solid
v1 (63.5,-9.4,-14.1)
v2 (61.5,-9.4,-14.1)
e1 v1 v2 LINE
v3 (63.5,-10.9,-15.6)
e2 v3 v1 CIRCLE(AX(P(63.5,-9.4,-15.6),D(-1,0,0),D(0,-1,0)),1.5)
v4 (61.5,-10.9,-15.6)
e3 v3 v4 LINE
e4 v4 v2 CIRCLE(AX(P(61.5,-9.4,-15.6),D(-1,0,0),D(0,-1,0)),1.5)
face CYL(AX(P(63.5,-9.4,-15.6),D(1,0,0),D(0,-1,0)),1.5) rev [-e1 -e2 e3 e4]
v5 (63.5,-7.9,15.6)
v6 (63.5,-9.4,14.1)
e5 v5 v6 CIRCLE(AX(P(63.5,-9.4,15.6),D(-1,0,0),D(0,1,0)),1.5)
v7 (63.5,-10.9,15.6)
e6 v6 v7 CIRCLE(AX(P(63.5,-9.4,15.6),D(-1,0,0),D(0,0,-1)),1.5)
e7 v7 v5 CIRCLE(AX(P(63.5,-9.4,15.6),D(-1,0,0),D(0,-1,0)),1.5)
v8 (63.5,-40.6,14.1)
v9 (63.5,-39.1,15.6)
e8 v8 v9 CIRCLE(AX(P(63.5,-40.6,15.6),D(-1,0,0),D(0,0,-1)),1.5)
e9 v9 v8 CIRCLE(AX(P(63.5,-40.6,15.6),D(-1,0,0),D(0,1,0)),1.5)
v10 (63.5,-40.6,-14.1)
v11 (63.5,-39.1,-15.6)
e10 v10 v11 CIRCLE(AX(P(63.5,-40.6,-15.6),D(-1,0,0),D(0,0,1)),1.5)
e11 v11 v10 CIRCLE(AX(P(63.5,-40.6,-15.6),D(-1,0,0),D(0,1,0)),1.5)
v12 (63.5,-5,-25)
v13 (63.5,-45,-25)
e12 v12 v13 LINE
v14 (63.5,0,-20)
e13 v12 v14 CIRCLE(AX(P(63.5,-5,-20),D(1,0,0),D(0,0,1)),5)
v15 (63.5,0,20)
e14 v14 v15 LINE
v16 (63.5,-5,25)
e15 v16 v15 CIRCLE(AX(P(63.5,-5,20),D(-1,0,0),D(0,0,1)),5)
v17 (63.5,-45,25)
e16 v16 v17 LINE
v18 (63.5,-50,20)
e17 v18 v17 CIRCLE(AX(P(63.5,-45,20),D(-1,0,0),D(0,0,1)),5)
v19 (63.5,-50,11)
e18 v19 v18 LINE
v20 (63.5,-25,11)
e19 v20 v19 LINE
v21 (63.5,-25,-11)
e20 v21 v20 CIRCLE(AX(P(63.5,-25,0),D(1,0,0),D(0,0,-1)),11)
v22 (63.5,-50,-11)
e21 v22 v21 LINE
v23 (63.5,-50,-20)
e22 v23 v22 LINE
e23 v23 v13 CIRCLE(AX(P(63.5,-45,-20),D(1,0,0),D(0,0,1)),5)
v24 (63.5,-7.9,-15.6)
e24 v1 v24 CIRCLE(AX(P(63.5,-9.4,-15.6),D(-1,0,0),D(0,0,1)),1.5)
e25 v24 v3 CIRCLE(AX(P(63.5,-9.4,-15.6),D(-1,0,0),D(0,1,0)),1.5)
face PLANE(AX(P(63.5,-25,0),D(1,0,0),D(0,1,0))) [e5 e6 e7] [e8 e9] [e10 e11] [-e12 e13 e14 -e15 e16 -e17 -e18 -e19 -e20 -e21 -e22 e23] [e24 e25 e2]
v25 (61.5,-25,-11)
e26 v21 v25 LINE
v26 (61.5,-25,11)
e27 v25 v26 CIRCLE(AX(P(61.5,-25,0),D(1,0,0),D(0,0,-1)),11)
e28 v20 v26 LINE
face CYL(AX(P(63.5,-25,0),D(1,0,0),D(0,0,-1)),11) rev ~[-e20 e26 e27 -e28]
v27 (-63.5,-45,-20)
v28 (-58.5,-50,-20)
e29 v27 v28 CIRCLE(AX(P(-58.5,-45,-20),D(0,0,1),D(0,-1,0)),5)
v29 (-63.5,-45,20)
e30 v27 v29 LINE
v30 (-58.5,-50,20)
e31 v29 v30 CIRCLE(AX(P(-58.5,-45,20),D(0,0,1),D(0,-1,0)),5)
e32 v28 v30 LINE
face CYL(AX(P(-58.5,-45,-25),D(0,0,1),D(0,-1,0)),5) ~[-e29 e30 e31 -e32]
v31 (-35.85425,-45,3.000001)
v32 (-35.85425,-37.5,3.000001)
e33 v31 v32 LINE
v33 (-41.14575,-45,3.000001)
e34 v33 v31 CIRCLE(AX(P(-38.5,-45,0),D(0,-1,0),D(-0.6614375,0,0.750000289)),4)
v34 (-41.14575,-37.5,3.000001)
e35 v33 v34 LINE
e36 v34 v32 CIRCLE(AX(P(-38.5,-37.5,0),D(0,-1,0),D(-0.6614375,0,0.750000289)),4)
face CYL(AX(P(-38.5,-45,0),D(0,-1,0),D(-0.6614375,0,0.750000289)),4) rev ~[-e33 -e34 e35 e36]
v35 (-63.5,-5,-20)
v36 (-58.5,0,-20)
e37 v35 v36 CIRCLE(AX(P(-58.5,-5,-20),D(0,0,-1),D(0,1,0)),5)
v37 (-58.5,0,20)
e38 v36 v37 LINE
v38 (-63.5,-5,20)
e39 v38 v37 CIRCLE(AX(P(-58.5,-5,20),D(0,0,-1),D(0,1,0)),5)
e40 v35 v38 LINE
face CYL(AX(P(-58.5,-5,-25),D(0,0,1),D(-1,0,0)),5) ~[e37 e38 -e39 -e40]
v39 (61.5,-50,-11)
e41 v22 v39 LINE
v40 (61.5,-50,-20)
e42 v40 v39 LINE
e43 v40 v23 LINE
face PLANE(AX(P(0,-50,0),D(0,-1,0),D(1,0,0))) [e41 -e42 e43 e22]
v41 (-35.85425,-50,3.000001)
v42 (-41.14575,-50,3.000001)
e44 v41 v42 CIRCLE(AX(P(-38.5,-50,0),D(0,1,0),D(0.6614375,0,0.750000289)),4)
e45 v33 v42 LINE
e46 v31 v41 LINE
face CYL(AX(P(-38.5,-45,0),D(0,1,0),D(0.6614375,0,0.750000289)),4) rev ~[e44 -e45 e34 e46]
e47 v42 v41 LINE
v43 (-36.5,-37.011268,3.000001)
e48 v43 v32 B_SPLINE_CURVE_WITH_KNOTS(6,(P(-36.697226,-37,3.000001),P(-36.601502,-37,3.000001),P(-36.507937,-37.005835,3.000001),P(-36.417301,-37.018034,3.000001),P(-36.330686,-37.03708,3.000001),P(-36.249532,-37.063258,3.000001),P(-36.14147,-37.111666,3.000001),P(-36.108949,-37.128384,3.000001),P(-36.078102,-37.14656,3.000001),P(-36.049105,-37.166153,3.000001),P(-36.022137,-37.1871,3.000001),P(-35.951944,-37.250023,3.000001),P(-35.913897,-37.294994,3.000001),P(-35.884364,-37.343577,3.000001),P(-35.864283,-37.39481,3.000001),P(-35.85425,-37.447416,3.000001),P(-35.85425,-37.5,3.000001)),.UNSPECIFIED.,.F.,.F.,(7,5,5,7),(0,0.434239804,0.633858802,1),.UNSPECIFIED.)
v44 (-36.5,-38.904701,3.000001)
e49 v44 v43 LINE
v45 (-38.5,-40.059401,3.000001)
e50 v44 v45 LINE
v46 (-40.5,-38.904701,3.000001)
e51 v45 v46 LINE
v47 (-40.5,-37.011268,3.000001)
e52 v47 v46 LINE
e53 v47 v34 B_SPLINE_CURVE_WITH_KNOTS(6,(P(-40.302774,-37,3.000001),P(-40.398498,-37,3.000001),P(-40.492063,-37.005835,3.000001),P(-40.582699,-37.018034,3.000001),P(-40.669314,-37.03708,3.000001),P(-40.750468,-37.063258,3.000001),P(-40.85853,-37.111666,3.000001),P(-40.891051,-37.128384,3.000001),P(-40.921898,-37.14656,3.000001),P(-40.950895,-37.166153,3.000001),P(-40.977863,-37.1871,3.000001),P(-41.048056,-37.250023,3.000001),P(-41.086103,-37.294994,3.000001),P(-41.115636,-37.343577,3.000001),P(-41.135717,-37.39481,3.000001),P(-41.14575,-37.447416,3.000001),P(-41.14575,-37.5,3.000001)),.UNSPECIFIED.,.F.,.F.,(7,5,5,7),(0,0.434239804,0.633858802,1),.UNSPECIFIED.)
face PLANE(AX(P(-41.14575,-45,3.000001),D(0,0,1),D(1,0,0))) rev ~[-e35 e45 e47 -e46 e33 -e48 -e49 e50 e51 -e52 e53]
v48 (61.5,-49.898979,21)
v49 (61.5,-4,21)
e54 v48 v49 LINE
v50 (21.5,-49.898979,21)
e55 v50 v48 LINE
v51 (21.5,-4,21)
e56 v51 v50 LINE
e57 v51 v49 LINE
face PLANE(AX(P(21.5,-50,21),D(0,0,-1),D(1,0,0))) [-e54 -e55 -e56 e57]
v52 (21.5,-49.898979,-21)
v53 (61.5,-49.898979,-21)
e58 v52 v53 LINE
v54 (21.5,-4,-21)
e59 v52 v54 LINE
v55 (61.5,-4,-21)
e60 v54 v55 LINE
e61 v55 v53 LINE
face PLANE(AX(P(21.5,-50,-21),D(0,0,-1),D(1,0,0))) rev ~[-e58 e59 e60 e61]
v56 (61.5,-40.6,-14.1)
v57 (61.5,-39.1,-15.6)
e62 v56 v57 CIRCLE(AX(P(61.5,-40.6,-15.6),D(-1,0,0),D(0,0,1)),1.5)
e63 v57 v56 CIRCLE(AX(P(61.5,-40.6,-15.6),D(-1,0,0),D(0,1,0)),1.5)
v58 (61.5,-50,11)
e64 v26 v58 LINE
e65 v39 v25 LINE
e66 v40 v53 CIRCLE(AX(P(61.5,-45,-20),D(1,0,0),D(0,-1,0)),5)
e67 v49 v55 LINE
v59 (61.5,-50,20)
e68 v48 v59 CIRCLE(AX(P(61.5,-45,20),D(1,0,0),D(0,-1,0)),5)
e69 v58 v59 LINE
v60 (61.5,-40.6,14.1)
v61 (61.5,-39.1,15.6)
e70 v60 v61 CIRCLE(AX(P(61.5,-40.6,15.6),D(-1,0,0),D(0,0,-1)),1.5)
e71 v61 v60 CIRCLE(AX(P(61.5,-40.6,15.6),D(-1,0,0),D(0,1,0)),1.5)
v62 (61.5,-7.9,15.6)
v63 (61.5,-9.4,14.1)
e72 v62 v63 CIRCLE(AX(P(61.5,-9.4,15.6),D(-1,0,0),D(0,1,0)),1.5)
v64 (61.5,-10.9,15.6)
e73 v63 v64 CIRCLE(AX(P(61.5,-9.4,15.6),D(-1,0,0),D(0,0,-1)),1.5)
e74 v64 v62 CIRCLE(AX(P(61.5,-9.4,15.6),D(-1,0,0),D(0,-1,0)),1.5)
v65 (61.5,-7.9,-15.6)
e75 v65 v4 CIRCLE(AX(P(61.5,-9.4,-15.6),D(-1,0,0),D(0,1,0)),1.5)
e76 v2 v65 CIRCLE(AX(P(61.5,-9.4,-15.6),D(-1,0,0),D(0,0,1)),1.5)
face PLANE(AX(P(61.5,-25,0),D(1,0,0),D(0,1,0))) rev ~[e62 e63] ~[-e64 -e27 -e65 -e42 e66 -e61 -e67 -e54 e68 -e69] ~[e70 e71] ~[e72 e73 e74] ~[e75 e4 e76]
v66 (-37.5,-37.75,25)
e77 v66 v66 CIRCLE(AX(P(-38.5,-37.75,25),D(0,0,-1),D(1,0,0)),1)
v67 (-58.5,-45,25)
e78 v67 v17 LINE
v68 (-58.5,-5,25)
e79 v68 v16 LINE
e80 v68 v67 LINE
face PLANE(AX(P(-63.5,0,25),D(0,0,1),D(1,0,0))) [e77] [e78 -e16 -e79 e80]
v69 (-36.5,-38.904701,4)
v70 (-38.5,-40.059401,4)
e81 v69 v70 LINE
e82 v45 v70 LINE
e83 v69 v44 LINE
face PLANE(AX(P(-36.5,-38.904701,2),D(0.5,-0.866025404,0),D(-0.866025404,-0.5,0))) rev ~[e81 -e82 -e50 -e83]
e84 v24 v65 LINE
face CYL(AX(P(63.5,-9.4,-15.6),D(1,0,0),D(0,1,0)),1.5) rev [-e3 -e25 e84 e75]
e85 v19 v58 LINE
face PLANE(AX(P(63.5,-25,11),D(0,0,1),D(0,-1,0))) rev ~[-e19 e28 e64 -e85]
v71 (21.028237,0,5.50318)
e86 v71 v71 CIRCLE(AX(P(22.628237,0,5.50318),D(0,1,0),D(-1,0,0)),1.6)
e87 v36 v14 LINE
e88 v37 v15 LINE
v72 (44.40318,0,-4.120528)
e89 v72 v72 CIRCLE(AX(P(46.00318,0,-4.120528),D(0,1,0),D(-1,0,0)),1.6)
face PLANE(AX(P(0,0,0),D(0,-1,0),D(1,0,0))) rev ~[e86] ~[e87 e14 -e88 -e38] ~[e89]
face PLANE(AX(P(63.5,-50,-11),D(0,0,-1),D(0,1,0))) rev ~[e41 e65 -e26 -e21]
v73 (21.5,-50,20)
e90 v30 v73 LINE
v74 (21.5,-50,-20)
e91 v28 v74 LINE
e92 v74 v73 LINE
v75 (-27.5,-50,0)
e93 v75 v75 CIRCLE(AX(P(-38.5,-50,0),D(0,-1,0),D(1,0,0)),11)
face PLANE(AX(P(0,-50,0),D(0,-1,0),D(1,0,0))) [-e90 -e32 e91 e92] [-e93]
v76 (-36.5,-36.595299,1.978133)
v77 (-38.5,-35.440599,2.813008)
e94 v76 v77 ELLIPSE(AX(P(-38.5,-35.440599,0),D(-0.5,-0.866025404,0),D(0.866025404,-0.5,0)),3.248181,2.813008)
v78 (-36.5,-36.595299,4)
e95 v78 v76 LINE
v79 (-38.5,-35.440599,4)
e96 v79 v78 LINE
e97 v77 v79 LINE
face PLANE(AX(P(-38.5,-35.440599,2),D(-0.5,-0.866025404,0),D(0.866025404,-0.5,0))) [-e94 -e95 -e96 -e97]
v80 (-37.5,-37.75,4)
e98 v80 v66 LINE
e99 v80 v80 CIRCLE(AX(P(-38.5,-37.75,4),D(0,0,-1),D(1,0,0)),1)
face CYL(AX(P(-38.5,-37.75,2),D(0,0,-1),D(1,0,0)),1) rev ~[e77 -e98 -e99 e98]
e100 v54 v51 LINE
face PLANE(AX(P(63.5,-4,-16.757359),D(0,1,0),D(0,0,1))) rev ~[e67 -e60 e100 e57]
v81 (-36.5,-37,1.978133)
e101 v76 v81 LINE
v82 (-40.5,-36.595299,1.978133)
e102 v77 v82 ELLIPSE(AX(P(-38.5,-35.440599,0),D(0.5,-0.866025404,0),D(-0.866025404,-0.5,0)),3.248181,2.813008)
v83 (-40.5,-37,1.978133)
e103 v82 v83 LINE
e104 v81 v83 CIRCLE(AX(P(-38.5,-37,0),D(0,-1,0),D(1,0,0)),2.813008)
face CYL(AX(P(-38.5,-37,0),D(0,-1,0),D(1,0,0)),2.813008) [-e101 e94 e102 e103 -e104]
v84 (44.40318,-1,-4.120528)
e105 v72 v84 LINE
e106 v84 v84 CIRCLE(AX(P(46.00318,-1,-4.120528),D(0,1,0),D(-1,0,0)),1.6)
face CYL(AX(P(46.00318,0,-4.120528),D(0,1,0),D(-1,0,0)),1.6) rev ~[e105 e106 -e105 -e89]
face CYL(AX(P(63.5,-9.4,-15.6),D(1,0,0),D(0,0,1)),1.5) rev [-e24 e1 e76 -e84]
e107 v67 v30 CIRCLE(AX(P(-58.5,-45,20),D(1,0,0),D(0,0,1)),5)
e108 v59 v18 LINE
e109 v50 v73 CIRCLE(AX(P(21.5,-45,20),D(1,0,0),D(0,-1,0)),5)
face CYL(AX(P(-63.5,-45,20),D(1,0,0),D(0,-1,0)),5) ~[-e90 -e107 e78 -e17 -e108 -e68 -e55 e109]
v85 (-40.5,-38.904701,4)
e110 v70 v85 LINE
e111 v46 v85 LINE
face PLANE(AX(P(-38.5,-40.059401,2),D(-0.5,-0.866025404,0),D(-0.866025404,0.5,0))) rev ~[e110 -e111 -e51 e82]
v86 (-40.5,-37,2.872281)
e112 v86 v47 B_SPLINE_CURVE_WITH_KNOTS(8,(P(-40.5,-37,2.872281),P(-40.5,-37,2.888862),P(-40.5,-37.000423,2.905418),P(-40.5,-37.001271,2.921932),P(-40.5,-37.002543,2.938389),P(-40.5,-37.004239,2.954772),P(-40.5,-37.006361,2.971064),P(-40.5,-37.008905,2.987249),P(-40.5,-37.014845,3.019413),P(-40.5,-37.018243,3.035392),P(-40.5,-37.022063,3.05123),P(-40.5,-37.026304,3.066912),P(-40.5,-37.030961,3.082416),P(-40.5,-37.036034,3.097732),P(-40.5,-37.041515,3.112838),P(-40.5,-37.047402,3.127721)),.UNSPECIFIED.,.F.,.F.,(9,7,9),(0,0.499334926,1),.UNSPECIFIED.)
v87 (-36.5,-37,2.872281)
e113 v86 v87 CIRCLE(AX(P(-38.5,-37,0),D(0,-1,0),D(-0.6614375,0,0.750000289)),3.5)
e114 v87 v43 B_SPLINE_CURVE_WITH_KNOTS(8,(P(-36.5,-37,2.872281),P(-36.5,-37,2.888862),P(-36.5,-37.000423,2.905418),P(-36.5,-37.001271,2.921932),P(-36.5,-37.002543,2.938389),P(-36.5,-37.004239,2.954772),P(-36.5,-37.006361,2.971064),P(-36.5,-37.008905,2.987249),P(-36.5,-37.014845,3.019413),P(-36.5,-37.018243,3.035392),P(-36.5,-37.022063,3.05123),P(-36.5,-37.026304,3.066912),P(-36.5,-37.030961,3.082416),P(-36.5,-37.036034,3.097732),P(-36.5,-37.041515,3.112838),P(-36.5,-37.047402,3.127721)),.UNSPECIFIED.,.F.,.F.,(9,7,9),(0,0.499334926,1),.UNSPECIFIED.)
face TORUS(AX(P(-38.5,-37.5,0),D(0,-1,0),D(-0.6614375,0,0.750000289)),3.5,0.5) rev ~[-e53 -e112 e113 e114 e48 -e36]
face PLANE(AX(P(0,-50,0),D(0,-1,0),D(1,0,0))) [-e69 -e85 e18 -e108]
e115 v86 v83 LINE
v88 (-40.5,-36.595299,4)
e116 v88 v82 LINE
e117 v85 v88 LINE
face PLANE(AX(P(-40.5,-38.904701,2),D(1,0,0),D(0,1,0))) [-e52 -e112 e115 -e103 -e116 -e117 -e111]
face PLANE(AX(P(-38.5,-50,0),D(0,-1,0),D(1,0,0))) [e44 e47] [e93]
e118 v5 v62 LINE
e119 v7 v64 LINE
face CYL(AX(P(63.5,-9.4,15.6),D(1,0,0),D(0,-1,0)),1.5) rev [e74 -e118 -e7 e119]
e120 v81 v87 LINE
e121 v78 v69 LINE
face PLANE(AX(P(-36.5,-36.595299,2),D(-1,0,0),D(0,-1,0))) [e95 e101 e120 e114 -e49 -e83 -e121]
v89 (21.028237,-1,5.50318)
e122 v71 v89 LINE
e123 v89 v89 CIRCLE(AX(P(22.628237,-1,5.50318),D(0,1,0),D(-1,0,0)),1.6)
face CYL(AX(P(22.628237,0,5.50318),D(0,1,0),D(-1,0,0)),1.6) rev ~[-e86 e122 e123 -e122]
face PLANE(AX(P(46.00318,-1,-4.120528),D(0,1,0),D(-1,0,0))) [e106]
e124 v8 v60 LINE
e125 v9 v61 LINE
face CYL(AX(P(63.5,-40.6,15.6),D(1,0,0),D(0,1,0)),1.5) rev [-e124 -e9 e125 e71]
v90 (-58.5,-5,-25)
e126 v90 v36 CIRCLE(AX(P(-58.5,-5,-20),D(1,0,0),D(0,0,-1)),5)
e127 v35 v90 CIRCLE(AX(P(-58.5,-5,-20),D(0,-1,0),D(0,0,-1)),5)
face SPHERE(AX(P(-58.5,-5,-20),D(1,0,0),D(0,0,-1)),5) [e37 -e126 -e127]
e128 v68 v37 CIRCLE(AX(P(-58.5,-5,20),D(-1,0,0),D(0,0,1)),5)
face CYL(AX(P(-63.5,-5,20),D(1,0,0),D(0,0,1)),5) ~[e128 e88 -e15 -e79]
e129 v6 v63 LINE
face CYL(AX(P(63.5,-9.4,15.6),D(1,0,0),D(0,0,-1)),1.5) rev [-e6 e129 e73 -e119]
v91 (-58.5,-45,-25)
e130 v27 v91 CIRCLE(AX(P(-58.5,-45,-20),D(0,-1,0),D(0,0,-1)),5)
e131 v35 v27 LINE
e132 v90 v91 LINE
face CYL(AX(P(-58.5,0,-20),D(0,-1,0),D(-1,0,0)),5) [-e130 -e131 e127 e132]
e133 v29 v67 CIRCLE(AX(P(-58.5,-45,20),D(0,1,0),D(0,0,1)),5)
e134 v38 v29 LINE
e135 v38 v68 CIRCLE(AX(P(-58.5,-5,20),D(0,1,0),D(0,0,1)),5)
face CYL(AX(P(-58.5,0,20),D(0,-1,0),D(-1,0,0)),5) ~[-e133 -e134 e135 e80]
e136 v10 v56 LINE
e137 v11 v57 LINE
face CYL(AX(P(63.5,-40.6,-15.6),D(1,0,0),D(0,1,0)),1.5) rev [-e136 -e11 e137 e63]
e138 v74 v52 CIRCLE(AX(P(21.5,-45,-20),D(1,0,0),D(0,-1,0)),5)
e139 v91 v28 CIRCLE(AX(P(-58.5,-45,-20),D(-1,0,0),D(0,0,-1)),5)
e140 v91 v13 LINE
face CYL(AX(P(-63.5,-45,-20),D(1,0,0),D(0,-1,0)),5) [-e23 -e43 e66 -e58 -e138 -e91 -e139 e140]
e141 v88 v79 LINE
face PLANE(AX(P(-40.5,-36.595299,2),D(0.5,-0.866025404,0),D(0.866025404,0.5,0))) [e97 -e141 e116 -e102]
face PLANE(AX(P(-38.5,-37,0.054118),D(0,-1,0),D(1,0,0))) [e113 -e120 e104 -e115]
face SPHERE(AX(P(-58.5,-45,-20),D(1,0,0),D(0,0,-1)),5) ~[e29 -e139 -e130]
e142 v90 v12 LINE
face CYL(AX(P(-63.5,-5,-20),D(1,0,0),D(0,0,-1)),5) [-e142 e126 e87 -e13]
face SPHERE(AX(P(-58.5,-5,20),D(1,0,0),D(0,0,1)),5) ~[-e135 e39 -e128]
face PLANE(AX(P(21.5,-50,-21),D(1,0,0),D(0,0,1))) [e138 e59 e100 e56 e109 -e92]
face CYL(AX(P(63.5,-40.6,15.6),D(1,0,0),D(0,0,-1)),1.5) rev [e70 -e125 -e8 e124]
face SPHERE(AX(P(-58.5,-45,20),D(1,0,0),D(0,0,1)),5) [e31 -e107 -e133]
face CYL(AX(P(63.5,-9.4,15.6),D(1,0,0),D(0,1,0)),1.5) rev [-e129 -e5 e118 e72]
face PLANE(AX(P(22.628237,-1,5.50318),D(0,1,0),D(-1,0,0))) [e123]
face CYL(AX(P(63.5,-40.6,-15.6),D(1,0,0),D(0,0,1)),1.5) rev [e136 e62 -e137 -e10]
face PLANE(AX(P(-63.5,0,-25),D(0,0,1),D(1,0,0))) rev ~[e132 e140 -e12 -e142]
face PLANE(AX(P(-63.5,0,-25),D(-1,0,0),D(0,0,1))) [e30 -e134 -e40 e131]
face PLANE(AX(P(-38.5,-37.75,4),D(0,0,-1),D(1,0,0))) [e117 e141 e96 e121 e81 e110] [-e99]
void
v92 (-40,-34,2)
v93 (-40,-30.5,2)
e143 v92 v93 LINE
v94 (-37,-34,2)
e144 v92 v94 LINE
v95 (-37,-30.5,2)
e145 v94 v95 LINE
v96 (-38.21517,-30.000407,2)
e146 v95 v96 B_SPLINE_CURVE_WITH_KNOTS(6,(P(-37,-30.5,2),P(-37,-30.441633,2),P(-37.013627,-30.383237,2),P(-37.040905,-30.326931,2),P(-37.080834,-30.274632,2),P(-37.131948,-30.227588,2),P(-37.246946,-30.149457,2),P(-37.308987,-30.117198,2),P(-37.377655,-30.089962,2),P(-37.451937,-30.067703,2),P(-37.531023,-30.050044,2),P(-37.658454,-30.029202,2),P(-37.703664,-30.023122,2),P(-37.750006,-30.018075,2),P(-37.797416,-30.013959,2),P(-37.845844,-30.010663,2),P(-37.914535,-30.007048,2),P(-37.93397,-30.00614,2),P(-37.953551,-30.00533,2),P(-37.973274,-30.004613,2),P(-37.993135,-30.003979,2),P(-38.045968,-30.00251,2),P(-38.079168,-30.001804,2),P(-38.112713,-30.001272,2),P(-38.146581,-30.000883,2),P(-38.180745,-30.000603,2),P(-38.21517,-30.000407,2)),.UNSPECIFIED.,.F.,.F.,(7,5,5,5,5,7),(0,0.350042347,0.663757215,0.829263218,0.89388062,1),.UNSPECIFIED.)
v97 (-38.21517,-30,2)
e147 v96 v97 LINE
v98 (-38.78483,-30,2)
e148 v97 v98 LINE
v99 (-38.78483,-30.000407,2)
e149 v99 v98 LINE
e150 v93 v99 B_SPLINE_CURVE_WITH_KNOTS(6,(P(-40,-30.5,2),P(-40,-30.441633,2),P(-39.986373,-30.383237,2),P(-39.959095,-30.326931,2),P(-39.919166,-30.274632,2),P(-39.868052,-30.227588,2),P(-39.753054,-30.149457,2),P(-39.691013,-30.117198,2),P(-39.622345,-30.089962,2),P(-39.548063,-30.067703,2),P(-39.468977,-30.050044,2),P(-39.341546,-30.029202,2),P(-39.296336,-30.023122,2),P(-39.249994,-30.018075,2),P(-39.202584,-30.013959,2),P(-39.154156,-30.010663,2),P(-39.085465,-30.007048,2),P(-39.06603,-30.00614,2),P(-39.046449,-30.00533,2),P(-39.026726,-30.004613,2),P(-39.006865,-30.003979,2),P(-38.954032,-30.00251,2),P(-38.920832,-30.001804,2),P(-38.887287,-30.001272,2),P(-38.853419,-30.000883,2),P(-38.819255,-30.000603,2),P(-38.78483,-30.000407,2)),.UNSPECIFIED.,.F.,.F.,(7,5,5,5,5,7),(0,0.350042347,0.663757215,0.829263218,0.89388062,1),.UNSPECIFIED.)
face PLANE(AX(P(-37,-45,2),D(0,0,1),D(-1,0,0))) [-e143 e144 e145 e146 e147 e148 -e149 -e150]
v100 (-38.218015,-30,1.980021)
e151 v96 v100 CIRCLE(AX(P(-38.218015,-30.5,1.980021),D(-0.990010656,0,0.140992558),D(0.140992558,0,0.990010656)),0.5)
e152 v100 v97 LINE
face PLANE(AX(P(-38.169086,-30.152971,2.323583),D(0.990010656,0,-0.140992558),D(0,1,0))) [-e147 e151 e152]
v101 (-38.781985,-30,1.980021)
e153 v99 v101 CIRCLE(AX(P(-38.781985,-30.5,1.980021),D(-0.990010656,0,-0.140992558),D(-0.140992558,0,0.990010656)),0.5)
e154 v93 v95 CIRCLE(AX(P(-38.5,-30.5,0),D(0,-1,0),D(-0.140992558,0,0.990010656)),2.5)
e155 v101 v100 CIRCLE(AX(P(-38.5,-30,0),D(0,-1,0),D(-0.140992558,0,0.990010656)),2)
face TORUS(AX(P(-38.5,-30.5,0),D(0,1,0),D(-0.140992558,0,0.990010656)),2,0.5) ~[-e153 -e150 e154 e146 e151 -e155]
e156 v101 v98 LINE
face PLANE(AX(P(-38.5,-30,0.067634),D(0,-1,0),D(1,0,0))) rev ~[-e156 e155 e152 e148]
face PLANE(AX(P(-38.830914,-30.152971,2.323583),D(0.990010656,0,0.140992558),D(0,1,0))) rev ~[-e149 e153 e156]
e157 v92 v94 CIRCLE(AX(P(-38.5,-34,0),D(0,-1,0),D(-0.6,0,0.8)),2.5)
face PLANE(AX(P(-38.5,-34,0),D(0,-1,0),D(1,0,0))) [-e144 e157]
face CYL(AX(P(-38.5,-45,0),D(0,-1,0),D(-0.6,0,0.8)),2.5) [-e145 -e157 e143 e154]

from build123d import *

# Parameters (mm, degrees)
F0_W           = 127
F0_H           = 50
F1_DEPTH       = 50
F3_DEPTH       = 42
F4_R           = 11
F5_DEPTH       = 5
F7_DEPTH       = 15
F8_T2_ANGLE    = 343.7894292622
F9_R           = 5
F12_W          = 40
F12_H          = 42
F13_DEPTH      = 46
F14_R          = 1.6
F15_DEPTH      = 1
F16_R          = 1
F17_DEPTH      = 2
F17_DEPTH_BACK = 1.03
F18_DEPTH      = 25
F19_DEPTH      = 2
F20_DEPTH      = 25
F22_DEPTH      = 8
F23_R          = 2.8130076525
F24_DEPTH      = 3
F25_R          = 0.5
F26_R          = 11
F27_DEPTH      = 5


# Not quite as in the source:
# - a fillet or chamfer that OpenCascade refuses, or shapes differently, is made with other operations: its cross-section is extruded or revolved along the edge and cut away or added


with BuildPart() as f1:
    # F0 (on Front) → F1 (new body)
    with BuildSketch(Plane.XZ):
        Rectangle(F0_W, F0_H)
    extrude(amount=F1_DEPTH)

    # F2 (on face) → F3 (cut)
    with BuildSketch(Plane.YZ.offset(63.5)):
        Polygon((-41.7573593129, 21), (-46, 16.7573593129), (-46, -16.7573593129), (-41.7573593129, -21), (-8.2426406871, -21), (-4, -16.7573593129), (-4, 16.7573593129), (-8.2426406871, 21), align=None)
    extrude(amount=-F3_DEPTH, mode=Mode.SUBTRACT)

    # F4 (on face) → F5 (cut)
    with BuildSketch(Plane.XZ.offset(50)):
        with Locations((-38.5, 0)):
            Circle(F4_R)
    extrude(amount=-F5_DEPTH, mode=Mode.SUBTRACT)

    # F6 (on face) → F7 (cut)
    with BuildSketch(Plane.XZ.offset(45)):
        with BuildLine():
            Line((-37, 2), (-40, 2))
            ThreePointArc((-40, 2), (-38.5, -2.5), (-37, 2))
        make_face()
    extrude(amount=-F7_DEPTH, mode=Mode.SUBTRACT)

    # F8: fillet of radius 0.5 on 1 edges, made by hand

    # F8_s1 → F8_t2 (revolve)
    with BuildSketch(Plane(origin=(-37.7346622942, 0, -5.3739891953), x_dir=(0, 1, 0), z_dir=(0.9900106558, 0, 0.1409925581))):
        with BuildLine():
            ThreePointArc((-30.5, 7.9282134883), (-30.1464466094, 7.7817668789), (-30, 7.4282134883))
            Line((-30, 7.4282134883), (-30, 7.9282134883))
            Line((-30, 7.9282134883), (-30.5, 7.9282134883))
        make_face()
    revolve(axis=Axis((-38.5, -30, 0), (0, -1, 0)), revolution_arc=F8_T2_ANGLE)

    # F9
    f9_edges = [f1.edges().sort_by_distance(p)[0] for p in [
        (0, -50, 25),
        (0, -50, -25),
        (0, 0, 25),
        (0, 0, -25),
        (-63.5, -25, 25),
        (-63.5, -25, -25),
        (-63.5, 0, 0),
        (-63.5, -50, 0),
    ]]
    fillet(f9_edges, radius=F9_R)

    # F12 (on face) → F13 (cut)
    with BuildSketch(Plane.XZ.offset(50)):
        with Locations((41.5, 0)):
            Rectangle(F12_W, F12_H)
    extrude(amount=-F13_DEPTH, mode=Mode.SUBTRACT)

    # F14 (on face) → F15 (cut)
    with BuildSketch(Plane(origin=(0, 0, 0), x_dir=(-1, 0, 0), z_dir=(0, 1, 0))):
        with Locations((-46.0031795697, -4.1205275279)):
            Circle(F14_R)
        with Locations((-22.6282365388, 5.5031795697)):
            Circle(F14_R)
    extrude(amount=-F15_DEPTH, mode=Mode.SUBTRACT)

    # F16 (on face) → F17 (cut, two sides)
    with BuildSketch(Plane(origin=(0, 0, 2), x_dir=(1, 0, 0), z_dir=(0, 0, -1))) as f17_sk:
        Polygon((-36.5, 38.9047005384), (-38.5, 40.0594010768), (-40.5, 38.9047005384), (-40.5, 36.5952994616), (-38.5, 35.4405989232), (-36.5, 36.5952994616), align=None)
        with Locations((-38.5, 37.75)):
            Circle(F16_R, mode=Mode.SUBTRACT)
    extrude(amount=-F17_DEPTH, mode=Mode.SUBTRACT)
    extrude(f17_sk.sketch, amount=F17_DEPTH_BACK, mode=Mode.SUBTRACT)

    # F18 (cut): a face of the model
    f18_faces = [f1.faces().sort_by_distance(p)[0] for p in [
        (-38.5, -37.75, 2),
    ]]
    extrude(f18_faces, amount=-F18_DEPTH, mode=Mode.SUBTRACT)

    # F10 (on face) → F19 (join)
    with BuildSketch(Plane.YZ.offset(63.5)):
        Polygon((-46, 16.7573593129), (-46, -16.7573593129), (-41.7573593129, -21), (-8.2426406871, -21), (-4, -16.7573593129), (-4, 16.7573593129), (-8.2426406871, 21), (-16.9, 21), (-33.1, 21), (-41.7573593129, 21), align=None)
        with BuildLine():
            Line((-10.9, -15.6), (-39.1, -15.6))
            ThreePointArc((-39.1, -15.6), (-41.6606601718, -16.6606601718), (-40.6, -14.1))
            Line((-40.6, -14.1), (-40.6, 14.1))
            ThreePointArc((-40.6, 14.1), (-41.6606601718, 16.6606601718), (-39.1, 15.6))
            Line((-39.1, 15.6), (-10.9, 15.6))
            ThreePointArc((-10.9, 15.6), (-9.4, 17.1), (-7.9, 15.6))
            ThreePointArc((-7.9, 15.6), (-8.3393398282, 14.5393398282), (-9.4, 14.1))
            Line((-9.4, 14.1), (-9.4, -14.1))
            ThreePointArc((-9.4, -14.1), (-8.3393398282, -14.5393398282), (-7.9, -15.6))
            ThreePointArc((-7.9, -15.6), (-9.4, -17.1), (-10.9, -15.6))
        make_face(mode=Mode.SUBTRACT)
        with BuildLine():
            ThreePointArc((-40.6, -14.1), (-39.5393398282, -14.5393398282), (-39.1, -15.6))
            Line((-39.1, -15.6), (-10.9, -15.6))
            ThreePointArc((-10.9, -15.6), (-10.4606601718, -14.5393398282), (-9.4, -14.1))
            Line((-9.4, -14.1), (-9.4, 14.1))
            ThreePointArc((-9.4, 14.1), (-10.4606601718, 14.5393398282), (-10.9, 15.6))
            Line((-10.9, 15.6), (-39.1, 15.6))
            ThreePointArc((-39.1, 15.6), (-39.5393398282, 14.5393398282), (-40.6, 14.1))
            Line((-40.6, 14.1), (-40.6, -14.1))
        make_face()
    extrude(amount=-F19_DEPTH)

    # F11 (on face) → F20 (cut)
    with BuildSketch(Plane.YZ.offset(63.5)):
        with BuildLine():
            Line((-50, -11), (-25, -11))
            ThreePointArc((-25, -11), (-14, 0), (-25, 11))
            Line((-25, 11), (-50, 11))
            Line((-50, 11), (-50, -11))
        make_face()
    extrude(amount=-F20_DEPTH, mode=Mode.SUBTRACT)

    # F21 (on face) → F22 (cut)
    with BuildSketch(Plane.XZ.offset(45)):
        with BuildLine():
            Line((-35.85425, 3.0000011562), (-41.14575, 3.0000011562))
            ThreePointArc((-41.14575, 3.0000011562), (-38.5, -4), (-35.85425, 3.0000011562))
        make_face()
    extrude(amount=-F22_DEPTH, mode=Mode.SUBTRACT)

    # F23 (on face) → F24 (join)
    with BuildSketch(Plane.XZ.offset(37)):
        with Locations((-38.5, 0)):
            Circle(F23_R)
    extrude(amount=-F24_DEPTH)

    # F25
    f25_edges = [f1.edges().sort_by_distance(p)[0] for p in [
        (-38.5, -37, -4),
    ]]
    fillet(f25_edges, radius=F25_R)

    # F26 (on face) → F27 (join, through all)
    with BuildSketch(Plane.XZ.offset(45)):
        with Locations((-38.5, 0)):
            Circle(F26_R)
        with BuildLine():
            ThreePointArc((-35.85425, 3.0000011562), (-38.5, -4), (-41.14575, 3.0000011562))
            Line((-41.14575, 3.0000011562), (-35.85425, 3.0000011562))
        make_face(mode=Mode.SUBTRACT)
    extrude(amount=F27_DEPTH)


solid = f1.part
